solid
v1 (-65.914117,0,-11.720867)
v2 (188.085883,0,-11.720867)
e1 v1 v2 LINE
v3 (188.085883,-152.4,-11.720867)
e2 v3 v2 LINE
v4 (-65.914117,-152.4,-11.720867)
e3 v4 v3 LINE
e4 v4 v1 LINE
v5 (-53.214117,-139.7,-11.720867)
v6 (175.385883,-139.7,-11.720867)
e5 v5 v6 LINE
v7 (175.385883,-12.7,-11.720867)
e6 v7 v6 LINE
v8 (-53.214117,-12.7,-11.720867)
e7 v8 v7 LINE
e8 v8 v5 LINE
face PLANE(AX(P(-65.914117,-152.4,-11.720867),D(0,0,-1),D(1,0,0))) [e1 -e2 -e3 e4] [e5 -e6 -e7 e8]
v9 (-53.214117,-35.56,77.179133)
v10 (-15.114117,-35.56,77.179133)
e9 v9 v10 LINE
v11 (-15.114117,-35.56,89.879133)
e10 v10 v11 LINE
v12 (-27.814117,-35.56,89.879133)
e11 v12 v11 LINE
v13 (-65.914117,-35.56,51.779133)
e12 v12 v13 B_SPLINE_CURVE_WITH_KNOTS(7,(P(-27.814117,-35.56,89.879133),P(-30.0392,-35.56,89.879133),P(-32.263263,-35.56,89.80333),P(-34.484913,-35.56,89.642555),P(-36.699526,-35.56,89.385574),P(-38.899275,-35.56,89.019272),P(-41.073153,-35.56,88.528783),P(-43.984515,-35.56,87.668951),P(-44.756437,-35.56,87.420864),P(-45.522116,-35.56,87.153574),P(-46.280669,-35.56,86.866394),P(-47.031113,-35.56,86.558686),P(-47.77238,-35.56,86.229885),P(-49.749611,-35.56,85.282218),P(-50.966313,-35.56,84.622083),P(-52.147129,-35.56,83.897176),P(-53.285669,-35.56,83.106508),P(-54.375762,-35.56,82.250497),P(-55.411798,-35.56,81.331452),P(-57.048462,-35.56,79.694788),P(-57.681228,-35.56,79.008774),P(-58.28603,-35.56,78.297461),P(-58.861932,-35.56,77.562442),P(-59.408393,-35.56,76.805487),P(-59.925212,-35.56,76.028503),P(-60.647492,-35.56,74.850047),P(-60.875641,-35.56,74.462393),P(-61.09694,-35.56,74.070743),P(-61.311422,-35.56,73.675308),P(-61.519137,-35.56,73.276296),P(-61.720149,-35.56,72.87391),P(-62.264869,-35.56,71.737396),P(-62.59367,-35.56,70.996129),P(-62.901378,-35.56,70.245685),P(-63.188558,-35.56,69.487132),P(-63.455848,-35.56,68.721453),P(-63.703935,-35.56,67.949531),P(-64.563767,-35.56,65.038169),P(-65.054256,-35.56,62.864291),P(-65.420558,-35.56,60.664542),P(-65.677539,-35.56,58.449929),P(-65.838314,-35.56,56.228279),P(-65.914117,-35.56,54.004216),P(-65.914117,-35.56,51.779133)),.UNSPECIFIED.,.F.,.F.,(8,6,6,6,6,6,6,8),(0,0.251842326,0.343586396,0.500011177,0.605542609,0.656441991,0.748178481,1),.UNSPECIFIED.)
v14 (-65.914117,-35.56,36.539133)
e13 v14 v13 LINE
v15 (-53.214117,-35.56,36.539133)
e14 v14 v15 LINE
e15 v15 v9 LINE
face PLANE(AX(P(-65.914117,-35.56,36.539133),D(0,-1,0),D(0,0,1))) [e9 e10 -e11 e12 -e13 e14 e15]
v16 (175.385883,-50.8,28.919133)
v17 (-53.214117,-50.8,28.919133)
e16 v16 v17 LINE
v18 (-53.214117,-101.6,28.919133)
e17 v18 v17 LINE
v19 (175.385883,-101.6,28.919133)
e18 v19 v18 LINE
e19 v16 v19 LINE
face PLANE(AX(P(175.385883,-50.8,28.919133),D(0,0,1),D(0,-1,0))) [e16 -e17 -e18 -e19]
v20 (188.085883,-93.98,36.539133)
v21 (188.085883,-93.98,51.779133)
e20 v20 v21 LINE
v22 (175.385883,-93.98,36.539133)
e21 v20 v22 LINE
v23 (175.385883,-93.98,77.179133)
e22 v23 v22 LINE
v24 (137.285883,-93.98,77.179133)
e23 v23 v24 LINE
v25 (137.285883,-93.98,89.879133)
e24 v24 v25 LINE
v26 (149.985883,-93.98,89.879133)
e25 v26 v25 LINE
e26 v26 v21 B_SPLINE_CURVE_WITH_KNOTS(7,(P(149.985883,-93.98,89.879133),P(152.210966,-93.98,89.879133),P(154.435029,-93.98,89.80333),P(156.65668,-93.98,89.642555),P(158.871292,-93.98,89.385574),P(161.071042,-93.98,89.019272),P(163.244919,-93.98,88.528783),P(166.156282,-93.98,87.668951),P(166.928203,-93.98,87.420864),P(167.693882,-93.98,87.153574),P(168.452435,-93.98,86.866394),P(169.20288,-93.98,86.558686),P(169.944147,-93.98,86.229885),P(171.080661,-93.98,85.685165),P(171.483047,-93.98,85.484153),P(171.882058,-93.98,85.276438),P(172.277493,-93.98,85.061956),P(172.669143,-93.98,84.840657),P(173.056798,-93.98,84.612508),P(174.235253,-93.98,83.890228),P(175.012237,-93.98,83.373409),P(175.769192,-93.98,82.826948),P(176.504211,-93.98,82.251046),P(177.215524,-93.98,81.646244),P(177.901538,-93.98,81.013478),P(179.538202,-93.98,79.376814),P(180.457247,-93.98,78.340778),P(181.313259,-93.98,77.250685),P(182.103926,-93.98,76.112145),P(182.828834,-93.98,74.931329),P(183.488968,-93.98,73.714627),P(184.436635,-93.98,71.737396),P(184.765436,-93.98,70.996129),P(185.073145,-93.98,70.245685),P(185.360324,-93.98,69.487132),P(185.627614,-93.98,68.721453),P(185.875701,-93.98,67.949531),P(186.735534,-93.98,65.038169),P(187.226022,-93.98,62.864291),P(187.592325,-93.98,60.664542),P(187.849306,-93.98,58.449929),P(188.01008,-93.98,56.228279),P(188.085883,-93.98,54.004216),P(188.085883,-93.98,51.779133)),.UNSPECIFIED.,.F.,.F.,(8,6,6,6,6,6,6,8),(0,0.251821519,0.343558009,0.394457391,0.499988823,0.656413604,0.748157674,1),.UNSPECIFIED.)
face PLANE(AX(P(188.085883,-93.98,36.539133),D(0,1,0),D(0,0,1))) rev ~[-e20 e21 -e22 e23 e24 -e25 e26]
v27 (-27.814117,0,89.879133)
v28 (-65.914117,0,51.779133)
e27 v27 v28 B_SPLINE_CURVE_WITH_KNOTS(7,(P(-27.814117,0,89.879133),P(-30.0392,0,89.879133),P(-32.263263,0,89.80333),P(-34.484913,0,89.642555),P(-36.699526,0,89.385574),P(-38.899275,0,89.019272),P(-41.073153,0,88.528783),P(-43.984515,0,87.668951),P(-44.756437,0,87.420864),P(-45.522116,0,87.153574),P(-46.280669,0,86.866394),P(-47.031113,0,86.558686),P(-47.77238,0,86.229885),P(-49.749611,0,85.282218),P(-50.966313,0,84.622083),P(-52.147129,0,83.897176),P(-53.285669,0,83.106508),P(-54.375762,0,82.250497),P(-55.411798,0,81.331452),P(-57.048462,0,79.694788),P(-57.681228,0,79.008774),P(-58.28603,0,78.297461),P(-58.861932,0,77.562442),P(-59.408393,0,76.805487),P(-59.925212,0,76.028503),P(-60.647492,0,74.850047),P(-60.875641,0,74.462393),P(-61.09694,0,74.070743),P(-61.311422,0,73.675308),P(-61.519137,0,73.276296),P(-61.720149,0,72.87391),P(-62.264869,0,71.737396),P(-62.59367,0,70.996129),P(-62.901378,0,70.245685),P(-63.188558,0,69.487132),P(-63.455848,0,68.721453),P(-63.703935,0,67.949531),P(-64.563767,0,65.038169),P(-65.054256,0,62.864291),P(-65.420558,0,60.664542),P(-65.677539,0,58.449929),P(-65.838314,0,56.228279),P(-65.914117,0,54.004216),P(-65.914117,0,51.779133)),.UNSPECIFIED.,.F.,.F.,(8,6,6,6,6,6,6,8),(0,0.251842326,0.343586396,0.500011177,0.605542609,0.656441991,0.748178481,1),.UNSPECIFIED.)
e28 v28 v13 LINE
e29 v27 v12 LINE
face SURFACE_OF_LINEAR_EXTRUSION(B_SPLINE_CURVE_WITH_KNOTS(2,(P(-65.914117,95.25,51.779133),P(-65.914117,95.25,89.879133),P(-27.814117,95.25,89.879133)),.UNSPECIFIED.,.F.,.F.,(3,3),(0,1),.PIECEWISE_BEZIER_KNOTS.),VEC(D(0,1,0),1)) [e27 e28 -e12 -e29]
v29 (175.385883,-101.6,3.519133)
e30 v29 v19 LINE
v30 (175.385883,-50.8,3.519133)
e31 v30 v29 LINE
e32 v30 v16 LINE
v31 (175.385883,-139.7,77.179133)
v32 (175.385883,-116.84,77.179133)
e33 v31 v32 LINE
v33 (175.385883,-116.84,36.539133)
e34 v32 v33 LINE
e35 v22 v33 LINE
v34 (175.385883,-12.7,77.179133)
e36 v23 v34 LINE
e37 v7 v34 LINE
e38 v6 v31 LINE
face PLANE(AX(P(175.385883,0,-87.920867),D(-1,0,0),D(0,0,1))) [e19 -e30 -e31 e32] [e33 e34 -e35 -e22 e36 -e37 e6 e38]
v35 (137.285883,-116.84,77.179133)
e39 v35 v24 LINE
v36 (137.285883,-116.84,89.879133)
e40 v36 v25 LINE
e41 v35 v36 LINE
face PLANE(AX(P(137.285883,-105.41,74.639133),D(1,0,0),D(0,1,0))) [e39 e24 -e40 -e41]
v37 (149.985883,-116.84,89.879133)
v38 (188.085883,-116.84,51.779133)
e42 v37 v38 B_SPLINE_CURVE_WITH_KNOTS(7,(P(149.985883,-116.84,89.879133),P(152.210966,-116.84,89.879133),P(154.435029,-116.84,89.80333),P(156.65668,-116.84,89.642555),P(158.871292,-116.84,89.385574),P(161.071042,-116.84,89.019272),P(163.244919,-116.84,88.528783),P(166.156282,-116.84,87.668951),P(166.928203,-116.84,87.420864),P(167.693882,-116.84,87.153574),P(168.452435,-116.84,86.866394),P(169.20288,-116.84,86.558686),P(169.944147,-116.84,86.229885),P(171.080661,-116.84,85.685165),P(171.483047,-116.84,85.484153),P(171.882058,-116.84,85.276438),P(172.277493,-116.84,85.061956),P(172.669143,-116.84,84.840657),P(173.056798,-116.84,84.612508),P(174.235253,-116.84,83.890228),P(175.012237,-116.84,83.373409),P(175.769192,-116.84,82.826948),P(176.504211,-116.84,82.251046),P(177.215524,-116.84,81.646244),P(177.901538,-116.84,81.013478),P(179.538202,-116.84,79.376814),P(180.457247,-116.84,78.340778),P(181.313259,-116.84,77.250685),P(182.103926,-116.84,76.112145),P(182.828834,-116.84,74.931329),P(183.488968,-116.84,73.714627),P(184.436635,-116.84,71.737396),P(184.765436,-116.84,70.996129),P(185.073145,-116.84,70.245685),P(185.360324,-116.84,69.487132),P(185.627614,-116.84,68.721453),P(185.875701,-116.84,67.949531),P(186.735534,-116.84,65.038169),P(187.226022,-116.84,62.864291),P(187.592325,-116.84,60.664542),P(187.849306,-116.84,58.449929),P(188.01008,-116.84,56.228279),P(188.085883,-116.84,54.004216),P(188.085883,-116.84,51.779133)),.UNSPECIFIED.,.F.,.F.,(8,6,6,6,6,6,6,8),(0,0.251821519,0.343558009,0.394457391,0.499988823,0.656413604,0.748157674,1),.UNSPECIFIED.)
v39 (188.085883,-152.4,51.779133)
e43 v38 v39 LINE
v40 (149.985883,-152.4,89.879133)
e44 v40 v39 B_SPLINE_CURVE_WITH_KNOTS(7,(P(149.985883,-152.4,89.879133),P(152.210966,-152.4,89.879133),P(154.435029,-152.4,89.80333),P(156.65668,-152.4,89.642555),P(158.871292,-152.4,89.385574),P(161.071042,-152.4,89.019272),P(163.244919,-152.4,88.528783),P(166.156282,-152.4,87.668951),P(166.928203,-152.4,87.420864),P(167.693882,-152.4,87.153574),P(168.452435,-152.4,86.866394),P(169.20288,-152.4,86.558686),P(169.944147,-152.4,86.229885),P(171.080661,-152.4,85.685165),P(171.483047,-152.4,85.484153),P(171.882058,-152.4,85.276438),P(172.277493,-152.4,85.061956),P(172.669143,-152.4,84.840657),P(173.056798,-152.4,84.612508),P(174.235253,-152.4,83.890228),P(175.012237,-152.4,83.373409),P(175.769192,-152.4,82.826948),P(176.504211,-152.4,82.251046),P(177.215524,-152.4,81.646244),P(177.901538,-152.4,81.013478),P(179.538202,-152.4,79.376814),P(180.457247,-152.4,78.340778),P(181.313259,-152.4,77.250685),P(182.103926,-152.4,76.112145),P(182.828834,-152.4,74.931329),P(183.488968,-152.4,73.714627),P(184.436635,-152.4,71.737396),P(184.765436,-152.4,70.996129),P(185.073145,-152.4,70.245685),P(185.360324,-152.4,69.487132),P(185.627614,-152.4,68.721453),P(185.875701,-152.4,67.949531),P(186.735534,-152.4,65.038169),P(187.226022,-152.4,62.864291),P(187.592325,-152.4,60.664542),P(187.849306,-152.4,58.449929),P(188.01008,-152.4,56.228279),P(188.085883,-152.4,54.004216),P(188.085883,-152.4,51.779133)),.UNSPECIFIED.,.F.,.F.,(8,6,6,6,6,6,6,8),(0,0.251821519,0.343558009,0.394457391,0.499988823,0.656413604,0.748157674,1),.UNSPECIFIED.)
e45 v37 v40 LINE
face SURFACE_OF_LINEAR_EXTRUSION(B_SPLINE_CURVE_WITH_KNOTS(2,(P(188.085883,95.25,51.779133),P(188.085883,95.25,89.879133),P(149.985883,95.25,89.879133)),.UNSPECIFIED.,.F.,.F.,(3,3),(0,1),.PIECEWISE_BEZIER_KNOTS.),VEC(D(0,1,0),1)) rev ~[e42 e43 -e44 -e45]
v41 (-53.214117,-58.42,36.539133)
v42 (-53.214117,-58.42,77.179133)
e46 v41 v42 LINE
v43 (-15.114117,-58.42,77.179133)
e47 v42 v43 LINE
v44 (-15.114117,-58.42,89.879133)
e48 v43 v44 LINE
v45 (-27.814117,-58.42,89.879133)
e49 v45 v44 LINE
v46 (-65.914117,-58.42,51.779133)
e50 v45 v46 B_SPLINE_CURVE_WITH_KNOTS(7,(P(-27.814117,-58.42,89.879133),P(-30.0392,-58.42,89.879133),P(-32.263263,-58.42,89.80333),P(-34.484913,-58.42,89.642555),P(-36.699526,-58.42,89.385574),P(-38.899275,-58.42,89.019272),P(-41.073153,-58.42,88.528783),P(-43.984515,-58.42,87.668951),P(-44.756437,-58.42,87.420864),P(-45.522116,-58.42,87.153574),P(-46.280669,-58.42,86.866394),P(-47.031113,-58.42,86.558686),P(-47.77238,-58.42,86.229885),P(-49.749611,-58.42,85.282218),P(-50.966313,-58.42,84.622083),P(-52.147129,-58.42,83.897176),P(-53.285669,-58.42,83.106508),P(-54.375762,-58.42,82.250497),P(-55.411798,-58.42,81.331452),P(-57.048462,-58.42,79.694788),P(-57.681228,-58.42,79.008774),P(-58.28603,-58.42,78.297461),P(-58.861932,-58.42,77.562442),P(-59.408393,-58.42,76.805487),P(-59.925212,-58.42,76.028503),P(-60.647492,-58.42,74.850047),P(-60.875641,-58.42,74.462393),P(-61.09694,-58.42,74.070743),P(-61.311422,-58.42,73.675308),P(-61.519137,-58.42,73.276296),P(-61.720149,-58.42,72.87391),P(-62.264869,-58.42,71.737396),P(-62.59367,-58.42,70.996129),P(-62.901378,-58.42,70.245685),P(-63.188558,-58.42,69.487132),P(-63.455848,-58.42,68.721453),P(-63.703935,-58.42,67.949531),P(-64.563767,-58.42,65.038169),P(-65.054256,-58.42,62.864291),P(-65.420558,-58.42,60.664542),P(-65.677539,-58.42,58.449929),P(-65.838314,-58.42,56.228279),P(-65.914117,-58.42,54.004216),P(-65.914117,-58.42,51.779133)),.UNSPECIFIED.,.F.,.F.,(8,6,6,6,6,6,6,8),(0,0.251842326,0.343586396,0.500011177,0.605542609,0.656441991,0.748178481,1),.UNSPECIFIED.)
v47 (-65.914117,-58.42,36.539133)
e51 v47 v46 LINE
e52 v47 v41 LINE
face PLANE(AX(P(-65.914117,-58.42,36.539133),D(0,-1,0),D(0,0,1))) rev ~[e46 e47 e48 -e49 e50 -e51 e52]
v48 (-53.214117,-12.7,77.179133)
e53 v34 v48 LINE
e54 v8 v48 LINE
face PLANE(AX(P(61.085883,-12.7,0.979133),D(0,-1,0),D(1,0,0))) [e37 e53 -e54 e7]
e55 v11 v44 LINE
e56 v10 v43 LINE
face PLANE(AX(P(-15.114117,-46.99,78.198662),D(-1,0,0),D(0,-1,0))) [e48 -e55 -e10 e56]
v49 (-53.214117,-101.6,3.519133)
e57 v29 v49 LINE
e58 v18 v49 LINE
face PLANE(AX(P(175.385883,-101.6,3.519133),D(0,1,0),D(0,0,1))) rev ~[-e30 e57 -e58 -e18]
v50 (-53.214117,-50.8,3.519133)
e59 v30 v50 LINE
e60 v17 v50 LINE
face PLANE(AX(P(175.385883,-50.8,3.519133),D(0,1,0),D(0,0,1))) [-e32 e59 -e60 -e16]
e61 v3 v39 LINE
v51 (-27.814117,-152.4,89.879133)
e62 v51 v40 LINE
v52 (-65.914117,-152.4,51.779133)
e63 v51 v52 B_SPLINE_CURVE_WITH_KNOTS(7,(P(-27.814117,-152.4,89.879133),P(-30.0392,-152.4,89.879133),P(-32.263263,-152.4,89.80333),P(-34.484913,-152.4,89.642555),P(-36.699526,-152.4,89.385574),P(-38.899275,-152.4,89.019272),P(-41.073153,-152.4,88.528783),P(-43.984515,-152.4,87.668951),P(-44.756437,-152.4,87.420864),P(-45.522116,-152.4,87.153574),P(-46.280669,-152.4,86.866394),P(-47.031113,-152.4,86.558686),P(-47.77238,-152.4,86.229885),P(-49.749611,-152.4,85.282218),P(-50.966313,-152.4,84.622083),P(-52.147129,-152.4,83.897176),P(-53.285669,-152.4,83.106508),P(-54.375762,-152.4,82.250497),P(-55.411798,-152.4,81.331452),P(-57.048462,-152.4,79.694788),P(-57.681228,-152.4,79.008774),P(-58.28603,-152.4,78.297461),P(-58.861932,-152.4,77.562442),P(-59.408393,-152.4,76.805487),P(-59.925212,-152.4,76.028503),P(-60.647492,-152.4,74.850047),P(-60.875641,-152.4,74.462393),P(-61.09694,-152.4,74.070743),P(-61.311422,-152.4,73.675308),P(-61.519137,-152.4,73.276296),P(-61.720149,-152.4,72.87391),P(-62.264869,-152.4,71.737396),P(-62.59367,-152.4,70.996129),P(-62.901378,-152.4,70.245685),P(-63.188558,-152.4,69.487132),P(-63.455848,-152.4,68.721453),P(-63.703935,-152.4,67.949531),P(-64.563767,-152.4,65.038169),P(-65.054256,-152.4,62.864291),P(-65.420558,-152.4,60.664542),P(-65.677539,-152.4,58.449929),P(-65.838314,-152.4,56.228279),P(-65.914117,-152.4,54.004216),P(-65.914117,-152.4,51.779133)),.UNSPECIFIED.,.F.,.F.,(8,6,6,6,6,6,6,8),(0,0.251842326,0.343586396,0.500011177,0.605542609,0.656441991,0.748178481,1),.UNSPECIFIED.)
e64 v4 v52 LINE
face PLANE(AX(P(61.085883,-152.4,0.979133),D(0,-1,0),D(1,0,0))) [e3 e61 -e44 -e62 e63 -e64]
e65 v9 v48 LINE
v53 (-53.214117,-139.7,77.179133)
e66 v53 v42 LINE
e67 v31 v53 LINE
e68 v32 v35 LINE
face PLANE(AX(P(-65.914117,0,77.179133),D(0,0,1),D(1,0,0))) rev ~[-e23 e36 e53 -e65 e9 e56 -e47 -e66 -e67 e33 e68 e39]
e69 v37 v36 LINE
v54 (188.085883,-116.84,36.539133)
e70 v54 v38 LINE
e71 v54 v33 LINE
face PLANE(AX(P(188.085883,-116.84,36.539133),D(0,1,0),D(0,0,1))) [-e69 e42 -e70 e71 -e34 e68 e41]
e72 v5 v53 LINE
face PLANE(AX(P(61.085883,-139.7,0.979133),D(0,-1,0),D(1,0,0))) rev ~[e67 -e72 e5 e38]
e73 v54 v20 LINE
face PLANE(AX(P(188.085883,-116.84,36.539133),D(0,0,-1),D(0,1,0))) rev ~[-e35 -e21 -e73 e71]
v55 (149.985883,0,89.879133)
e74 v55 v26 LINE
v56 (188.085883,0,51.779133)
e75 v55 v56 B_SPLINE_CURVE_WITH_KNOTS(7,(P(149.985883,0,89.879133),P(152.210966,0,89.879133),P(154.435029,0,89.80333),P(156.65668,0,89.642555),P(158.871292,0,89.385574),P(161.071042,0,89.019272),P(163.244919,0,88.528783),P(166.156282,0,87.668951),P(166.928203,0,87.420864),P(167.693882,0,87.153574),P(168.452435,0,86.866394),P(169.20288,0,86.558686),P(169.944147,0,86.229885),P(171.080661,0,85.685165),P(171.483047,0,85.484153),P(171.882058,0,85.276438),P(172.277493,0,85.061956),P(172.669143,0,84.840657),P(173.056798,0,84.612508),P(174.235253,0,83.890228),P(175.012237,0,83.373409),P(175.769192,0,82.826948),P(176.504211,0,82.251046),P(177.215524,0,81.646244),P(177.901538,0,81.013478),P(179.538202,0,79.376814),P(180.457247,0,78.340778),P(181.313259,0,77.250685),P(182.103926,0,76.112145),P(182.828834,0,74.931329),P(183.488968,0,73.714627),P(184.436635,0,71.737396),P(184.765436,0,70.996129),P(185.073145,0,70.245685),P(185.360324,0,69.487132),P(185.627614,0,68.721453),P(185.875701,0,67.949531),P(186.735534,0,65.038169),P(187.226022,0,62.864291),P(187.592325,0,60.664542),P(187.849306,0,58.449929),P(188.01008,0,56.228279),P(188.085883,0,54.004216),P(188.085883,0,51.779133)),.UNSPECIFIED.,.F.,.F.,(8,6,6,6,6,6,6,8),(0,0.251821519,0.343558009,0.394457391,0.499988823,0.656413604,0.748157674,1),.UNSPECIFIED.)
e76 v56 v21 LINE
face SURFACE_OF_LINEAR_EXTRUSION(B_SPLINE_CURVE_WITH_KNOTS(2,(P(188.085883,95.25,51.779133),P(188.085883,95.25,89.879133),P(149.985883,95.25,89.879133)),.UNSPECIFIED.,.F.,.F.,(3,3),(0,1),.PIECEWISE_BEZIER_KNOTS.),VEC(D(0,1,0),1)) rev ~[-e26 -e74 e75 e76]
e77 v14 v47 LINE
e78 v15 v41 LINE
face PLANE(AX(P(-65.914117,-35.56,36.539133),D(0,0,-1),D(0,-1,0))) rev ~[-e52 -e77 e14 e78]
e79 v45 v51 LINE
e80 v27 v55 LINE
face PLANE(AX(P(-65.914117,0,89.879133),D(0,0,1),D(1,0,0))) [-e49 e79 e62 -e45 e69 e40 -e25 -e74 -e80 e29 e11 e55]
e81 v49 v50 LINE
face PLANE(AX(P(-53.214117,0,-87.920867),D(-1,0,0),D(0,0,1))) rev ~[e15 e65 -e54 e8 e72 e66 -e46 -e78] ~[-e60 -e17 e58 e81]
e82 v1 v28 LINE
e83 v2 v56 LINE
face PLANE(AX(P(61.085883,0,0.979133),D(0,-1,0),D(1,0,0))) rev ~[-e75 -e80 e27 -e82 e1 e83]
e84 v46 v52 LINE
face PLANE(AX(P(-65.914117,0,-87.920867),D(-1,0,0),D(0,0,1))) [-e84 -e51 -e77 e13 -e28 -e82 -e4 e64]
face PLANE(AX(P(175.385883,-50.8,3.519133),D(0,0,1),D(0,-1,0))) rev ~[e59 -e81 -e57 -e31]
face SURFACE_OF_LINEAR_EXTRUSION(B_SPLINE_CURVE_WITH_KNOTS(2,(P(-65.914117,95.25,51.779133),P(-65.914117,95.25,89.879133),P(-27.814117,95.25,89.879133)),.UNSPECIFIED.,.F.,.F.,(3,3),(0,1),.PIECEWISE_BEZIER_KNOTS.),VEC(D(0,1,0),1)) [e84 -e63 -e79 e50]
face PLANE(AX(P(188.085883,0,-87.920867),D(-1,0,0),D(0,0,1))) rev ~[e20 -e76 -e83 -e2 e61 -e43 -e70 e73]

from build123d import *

# Parameters (mm, degrees)
F0_W        = 254
F0_H        = 177.8
F1_DEPTH    = 152.4
F2_T        = -12.7
F3_T1_DEPTH = 342.9
F4_T1_DEPTH = 342.9
F5_W        = 22.86
F5_H        = 83.3190586418
F6_DEPTH    = 50.8
F7_W        = 22.86
F7_H        = 76.2
F8_DEPTH    = 50.8
F9_W        = 50.8
F9_H        = 25.4
F10_DEPTH   = 233.68
F11_W       = 254
F11_H       = 76.2
F12_DEPTH   = 180.34


# Not quite as in the source:
# - a fillet or chamfer that OpenCascade refuses, or shapes differently, is made with other operations: its cross-section is extruded or revolved along the edge and cut away or added


with BuildPart() as f1:
    # F0 (on Front) → F1 (new body)
    with BuildSketch(Plane.XZ):
        with Locations((61.0858832002, 0.9791328073)):
            Rectangle(F0_W, F0_H)
    extrude(amount=F1_DEPTH)

    # F2
    f2_openings = [f1.faces().sort_by_distance(p)[0] for p in [
        (61.085883, -76.2, -87.920867),
    ]]
    offset(amount=F2_T, openings=f2_openings)

    # F3: fillet of radius 38.1 on 1 edges, made by hand

    # F3_s2 → F3_t1 (cut)
    with BuildSketch(Plane.XZ.offset(-95.25)):
        with BuildLine():
            add(Edge.make_bspline(
                [(188.0858832002, 51.7791328073), (188.0858832002, 89.8791328073), (149.9858832002, 89.8791328073)],
                knots=[0, 0, 0, 1, 1, 1], degree=2, weights=[1, 1, 1]))
            Line((149.9858832002, 89.8791328073), (188.0858832002, 89.8791328073))
            Line((188.0858832002, 89.8791328073), (188.0858832002, 51.7791328073))
        make_face()
    extrude(amount=F3_T1_DEPTH, mode=Mode.SUBTRACT)

    # F4: fillet of radius 38.1 on 1 edges, made by hand

    # F4_s2 → F4_t1 (cut)
    with BuildSketch(Plane.XZ.offset(-95.25)):
        with BuildLine():
            add(Edge.make_bspline(
                [(-65.9141167998, 51.7791328073), (-65.9141167998, 89.8791328073), (-27.8141167998, 89.8791328073)],
                knots=[0, 0, 0, 1, 1, 1], degree=2, weights=[1, 1, 1]))
            Line((-27.8141167998, 89.8791328073), (-65.9141167998, 89.8791328073))
            Line((-65.9141167998, 89.8791328073), (-65.9141167998, 51.7791328073))
        make_face()
    extrude(amount=F4_T1_DEPTH, mode=Mode.SUBTRACT)

    # F5 (on face) → F6 (cut)
    with BuildSketch(Plane(origin=(-65.9141167998, 0, 0), x_dir=(0, -1, 0), z_dir=(-1, 0, 0))):
        with Locations((46.99, 78.1986621282)):
            Rectangle(F5_W, F5_H)
    extrude(amount=-F6_DEPTH, mode=Mode.SUBTRACT)

    # F7 (on face) → F8 (cut)
    with BuildSketch(Plane.YZ.offset(188.0858832002)):
        with Locations((-105.41, 74.6391328073)):
            Rectangle(F7_W, F7_H)
    extrude(amount=-F8_DEPTH, mode=Mode.SUBTRACT)

    # F9 (on face) → F10 (join)
    with BuildSketch(Plane(origin=(175.3858832002, 0, 0), x_dir=(0, -1, 0), z_dir=(-1, 0, 0))):
        with Locations((76.2, 16.2191328073)):
            Rectangle(F9_W, F9_H)
    extrude(amount=F10_DEPTH)

    # F11 (on face) → F12 (cut)
    with BuildSketch(Plane.XZ.offset(152.4)):
        with Locations((61.0858832002, -49.8208671927)):
            Rectangle(F11_W, F11_H)
    extrude(amount=-F12_DEPTH, mode=Mode.SUBTRACT)


solid = f1.part
